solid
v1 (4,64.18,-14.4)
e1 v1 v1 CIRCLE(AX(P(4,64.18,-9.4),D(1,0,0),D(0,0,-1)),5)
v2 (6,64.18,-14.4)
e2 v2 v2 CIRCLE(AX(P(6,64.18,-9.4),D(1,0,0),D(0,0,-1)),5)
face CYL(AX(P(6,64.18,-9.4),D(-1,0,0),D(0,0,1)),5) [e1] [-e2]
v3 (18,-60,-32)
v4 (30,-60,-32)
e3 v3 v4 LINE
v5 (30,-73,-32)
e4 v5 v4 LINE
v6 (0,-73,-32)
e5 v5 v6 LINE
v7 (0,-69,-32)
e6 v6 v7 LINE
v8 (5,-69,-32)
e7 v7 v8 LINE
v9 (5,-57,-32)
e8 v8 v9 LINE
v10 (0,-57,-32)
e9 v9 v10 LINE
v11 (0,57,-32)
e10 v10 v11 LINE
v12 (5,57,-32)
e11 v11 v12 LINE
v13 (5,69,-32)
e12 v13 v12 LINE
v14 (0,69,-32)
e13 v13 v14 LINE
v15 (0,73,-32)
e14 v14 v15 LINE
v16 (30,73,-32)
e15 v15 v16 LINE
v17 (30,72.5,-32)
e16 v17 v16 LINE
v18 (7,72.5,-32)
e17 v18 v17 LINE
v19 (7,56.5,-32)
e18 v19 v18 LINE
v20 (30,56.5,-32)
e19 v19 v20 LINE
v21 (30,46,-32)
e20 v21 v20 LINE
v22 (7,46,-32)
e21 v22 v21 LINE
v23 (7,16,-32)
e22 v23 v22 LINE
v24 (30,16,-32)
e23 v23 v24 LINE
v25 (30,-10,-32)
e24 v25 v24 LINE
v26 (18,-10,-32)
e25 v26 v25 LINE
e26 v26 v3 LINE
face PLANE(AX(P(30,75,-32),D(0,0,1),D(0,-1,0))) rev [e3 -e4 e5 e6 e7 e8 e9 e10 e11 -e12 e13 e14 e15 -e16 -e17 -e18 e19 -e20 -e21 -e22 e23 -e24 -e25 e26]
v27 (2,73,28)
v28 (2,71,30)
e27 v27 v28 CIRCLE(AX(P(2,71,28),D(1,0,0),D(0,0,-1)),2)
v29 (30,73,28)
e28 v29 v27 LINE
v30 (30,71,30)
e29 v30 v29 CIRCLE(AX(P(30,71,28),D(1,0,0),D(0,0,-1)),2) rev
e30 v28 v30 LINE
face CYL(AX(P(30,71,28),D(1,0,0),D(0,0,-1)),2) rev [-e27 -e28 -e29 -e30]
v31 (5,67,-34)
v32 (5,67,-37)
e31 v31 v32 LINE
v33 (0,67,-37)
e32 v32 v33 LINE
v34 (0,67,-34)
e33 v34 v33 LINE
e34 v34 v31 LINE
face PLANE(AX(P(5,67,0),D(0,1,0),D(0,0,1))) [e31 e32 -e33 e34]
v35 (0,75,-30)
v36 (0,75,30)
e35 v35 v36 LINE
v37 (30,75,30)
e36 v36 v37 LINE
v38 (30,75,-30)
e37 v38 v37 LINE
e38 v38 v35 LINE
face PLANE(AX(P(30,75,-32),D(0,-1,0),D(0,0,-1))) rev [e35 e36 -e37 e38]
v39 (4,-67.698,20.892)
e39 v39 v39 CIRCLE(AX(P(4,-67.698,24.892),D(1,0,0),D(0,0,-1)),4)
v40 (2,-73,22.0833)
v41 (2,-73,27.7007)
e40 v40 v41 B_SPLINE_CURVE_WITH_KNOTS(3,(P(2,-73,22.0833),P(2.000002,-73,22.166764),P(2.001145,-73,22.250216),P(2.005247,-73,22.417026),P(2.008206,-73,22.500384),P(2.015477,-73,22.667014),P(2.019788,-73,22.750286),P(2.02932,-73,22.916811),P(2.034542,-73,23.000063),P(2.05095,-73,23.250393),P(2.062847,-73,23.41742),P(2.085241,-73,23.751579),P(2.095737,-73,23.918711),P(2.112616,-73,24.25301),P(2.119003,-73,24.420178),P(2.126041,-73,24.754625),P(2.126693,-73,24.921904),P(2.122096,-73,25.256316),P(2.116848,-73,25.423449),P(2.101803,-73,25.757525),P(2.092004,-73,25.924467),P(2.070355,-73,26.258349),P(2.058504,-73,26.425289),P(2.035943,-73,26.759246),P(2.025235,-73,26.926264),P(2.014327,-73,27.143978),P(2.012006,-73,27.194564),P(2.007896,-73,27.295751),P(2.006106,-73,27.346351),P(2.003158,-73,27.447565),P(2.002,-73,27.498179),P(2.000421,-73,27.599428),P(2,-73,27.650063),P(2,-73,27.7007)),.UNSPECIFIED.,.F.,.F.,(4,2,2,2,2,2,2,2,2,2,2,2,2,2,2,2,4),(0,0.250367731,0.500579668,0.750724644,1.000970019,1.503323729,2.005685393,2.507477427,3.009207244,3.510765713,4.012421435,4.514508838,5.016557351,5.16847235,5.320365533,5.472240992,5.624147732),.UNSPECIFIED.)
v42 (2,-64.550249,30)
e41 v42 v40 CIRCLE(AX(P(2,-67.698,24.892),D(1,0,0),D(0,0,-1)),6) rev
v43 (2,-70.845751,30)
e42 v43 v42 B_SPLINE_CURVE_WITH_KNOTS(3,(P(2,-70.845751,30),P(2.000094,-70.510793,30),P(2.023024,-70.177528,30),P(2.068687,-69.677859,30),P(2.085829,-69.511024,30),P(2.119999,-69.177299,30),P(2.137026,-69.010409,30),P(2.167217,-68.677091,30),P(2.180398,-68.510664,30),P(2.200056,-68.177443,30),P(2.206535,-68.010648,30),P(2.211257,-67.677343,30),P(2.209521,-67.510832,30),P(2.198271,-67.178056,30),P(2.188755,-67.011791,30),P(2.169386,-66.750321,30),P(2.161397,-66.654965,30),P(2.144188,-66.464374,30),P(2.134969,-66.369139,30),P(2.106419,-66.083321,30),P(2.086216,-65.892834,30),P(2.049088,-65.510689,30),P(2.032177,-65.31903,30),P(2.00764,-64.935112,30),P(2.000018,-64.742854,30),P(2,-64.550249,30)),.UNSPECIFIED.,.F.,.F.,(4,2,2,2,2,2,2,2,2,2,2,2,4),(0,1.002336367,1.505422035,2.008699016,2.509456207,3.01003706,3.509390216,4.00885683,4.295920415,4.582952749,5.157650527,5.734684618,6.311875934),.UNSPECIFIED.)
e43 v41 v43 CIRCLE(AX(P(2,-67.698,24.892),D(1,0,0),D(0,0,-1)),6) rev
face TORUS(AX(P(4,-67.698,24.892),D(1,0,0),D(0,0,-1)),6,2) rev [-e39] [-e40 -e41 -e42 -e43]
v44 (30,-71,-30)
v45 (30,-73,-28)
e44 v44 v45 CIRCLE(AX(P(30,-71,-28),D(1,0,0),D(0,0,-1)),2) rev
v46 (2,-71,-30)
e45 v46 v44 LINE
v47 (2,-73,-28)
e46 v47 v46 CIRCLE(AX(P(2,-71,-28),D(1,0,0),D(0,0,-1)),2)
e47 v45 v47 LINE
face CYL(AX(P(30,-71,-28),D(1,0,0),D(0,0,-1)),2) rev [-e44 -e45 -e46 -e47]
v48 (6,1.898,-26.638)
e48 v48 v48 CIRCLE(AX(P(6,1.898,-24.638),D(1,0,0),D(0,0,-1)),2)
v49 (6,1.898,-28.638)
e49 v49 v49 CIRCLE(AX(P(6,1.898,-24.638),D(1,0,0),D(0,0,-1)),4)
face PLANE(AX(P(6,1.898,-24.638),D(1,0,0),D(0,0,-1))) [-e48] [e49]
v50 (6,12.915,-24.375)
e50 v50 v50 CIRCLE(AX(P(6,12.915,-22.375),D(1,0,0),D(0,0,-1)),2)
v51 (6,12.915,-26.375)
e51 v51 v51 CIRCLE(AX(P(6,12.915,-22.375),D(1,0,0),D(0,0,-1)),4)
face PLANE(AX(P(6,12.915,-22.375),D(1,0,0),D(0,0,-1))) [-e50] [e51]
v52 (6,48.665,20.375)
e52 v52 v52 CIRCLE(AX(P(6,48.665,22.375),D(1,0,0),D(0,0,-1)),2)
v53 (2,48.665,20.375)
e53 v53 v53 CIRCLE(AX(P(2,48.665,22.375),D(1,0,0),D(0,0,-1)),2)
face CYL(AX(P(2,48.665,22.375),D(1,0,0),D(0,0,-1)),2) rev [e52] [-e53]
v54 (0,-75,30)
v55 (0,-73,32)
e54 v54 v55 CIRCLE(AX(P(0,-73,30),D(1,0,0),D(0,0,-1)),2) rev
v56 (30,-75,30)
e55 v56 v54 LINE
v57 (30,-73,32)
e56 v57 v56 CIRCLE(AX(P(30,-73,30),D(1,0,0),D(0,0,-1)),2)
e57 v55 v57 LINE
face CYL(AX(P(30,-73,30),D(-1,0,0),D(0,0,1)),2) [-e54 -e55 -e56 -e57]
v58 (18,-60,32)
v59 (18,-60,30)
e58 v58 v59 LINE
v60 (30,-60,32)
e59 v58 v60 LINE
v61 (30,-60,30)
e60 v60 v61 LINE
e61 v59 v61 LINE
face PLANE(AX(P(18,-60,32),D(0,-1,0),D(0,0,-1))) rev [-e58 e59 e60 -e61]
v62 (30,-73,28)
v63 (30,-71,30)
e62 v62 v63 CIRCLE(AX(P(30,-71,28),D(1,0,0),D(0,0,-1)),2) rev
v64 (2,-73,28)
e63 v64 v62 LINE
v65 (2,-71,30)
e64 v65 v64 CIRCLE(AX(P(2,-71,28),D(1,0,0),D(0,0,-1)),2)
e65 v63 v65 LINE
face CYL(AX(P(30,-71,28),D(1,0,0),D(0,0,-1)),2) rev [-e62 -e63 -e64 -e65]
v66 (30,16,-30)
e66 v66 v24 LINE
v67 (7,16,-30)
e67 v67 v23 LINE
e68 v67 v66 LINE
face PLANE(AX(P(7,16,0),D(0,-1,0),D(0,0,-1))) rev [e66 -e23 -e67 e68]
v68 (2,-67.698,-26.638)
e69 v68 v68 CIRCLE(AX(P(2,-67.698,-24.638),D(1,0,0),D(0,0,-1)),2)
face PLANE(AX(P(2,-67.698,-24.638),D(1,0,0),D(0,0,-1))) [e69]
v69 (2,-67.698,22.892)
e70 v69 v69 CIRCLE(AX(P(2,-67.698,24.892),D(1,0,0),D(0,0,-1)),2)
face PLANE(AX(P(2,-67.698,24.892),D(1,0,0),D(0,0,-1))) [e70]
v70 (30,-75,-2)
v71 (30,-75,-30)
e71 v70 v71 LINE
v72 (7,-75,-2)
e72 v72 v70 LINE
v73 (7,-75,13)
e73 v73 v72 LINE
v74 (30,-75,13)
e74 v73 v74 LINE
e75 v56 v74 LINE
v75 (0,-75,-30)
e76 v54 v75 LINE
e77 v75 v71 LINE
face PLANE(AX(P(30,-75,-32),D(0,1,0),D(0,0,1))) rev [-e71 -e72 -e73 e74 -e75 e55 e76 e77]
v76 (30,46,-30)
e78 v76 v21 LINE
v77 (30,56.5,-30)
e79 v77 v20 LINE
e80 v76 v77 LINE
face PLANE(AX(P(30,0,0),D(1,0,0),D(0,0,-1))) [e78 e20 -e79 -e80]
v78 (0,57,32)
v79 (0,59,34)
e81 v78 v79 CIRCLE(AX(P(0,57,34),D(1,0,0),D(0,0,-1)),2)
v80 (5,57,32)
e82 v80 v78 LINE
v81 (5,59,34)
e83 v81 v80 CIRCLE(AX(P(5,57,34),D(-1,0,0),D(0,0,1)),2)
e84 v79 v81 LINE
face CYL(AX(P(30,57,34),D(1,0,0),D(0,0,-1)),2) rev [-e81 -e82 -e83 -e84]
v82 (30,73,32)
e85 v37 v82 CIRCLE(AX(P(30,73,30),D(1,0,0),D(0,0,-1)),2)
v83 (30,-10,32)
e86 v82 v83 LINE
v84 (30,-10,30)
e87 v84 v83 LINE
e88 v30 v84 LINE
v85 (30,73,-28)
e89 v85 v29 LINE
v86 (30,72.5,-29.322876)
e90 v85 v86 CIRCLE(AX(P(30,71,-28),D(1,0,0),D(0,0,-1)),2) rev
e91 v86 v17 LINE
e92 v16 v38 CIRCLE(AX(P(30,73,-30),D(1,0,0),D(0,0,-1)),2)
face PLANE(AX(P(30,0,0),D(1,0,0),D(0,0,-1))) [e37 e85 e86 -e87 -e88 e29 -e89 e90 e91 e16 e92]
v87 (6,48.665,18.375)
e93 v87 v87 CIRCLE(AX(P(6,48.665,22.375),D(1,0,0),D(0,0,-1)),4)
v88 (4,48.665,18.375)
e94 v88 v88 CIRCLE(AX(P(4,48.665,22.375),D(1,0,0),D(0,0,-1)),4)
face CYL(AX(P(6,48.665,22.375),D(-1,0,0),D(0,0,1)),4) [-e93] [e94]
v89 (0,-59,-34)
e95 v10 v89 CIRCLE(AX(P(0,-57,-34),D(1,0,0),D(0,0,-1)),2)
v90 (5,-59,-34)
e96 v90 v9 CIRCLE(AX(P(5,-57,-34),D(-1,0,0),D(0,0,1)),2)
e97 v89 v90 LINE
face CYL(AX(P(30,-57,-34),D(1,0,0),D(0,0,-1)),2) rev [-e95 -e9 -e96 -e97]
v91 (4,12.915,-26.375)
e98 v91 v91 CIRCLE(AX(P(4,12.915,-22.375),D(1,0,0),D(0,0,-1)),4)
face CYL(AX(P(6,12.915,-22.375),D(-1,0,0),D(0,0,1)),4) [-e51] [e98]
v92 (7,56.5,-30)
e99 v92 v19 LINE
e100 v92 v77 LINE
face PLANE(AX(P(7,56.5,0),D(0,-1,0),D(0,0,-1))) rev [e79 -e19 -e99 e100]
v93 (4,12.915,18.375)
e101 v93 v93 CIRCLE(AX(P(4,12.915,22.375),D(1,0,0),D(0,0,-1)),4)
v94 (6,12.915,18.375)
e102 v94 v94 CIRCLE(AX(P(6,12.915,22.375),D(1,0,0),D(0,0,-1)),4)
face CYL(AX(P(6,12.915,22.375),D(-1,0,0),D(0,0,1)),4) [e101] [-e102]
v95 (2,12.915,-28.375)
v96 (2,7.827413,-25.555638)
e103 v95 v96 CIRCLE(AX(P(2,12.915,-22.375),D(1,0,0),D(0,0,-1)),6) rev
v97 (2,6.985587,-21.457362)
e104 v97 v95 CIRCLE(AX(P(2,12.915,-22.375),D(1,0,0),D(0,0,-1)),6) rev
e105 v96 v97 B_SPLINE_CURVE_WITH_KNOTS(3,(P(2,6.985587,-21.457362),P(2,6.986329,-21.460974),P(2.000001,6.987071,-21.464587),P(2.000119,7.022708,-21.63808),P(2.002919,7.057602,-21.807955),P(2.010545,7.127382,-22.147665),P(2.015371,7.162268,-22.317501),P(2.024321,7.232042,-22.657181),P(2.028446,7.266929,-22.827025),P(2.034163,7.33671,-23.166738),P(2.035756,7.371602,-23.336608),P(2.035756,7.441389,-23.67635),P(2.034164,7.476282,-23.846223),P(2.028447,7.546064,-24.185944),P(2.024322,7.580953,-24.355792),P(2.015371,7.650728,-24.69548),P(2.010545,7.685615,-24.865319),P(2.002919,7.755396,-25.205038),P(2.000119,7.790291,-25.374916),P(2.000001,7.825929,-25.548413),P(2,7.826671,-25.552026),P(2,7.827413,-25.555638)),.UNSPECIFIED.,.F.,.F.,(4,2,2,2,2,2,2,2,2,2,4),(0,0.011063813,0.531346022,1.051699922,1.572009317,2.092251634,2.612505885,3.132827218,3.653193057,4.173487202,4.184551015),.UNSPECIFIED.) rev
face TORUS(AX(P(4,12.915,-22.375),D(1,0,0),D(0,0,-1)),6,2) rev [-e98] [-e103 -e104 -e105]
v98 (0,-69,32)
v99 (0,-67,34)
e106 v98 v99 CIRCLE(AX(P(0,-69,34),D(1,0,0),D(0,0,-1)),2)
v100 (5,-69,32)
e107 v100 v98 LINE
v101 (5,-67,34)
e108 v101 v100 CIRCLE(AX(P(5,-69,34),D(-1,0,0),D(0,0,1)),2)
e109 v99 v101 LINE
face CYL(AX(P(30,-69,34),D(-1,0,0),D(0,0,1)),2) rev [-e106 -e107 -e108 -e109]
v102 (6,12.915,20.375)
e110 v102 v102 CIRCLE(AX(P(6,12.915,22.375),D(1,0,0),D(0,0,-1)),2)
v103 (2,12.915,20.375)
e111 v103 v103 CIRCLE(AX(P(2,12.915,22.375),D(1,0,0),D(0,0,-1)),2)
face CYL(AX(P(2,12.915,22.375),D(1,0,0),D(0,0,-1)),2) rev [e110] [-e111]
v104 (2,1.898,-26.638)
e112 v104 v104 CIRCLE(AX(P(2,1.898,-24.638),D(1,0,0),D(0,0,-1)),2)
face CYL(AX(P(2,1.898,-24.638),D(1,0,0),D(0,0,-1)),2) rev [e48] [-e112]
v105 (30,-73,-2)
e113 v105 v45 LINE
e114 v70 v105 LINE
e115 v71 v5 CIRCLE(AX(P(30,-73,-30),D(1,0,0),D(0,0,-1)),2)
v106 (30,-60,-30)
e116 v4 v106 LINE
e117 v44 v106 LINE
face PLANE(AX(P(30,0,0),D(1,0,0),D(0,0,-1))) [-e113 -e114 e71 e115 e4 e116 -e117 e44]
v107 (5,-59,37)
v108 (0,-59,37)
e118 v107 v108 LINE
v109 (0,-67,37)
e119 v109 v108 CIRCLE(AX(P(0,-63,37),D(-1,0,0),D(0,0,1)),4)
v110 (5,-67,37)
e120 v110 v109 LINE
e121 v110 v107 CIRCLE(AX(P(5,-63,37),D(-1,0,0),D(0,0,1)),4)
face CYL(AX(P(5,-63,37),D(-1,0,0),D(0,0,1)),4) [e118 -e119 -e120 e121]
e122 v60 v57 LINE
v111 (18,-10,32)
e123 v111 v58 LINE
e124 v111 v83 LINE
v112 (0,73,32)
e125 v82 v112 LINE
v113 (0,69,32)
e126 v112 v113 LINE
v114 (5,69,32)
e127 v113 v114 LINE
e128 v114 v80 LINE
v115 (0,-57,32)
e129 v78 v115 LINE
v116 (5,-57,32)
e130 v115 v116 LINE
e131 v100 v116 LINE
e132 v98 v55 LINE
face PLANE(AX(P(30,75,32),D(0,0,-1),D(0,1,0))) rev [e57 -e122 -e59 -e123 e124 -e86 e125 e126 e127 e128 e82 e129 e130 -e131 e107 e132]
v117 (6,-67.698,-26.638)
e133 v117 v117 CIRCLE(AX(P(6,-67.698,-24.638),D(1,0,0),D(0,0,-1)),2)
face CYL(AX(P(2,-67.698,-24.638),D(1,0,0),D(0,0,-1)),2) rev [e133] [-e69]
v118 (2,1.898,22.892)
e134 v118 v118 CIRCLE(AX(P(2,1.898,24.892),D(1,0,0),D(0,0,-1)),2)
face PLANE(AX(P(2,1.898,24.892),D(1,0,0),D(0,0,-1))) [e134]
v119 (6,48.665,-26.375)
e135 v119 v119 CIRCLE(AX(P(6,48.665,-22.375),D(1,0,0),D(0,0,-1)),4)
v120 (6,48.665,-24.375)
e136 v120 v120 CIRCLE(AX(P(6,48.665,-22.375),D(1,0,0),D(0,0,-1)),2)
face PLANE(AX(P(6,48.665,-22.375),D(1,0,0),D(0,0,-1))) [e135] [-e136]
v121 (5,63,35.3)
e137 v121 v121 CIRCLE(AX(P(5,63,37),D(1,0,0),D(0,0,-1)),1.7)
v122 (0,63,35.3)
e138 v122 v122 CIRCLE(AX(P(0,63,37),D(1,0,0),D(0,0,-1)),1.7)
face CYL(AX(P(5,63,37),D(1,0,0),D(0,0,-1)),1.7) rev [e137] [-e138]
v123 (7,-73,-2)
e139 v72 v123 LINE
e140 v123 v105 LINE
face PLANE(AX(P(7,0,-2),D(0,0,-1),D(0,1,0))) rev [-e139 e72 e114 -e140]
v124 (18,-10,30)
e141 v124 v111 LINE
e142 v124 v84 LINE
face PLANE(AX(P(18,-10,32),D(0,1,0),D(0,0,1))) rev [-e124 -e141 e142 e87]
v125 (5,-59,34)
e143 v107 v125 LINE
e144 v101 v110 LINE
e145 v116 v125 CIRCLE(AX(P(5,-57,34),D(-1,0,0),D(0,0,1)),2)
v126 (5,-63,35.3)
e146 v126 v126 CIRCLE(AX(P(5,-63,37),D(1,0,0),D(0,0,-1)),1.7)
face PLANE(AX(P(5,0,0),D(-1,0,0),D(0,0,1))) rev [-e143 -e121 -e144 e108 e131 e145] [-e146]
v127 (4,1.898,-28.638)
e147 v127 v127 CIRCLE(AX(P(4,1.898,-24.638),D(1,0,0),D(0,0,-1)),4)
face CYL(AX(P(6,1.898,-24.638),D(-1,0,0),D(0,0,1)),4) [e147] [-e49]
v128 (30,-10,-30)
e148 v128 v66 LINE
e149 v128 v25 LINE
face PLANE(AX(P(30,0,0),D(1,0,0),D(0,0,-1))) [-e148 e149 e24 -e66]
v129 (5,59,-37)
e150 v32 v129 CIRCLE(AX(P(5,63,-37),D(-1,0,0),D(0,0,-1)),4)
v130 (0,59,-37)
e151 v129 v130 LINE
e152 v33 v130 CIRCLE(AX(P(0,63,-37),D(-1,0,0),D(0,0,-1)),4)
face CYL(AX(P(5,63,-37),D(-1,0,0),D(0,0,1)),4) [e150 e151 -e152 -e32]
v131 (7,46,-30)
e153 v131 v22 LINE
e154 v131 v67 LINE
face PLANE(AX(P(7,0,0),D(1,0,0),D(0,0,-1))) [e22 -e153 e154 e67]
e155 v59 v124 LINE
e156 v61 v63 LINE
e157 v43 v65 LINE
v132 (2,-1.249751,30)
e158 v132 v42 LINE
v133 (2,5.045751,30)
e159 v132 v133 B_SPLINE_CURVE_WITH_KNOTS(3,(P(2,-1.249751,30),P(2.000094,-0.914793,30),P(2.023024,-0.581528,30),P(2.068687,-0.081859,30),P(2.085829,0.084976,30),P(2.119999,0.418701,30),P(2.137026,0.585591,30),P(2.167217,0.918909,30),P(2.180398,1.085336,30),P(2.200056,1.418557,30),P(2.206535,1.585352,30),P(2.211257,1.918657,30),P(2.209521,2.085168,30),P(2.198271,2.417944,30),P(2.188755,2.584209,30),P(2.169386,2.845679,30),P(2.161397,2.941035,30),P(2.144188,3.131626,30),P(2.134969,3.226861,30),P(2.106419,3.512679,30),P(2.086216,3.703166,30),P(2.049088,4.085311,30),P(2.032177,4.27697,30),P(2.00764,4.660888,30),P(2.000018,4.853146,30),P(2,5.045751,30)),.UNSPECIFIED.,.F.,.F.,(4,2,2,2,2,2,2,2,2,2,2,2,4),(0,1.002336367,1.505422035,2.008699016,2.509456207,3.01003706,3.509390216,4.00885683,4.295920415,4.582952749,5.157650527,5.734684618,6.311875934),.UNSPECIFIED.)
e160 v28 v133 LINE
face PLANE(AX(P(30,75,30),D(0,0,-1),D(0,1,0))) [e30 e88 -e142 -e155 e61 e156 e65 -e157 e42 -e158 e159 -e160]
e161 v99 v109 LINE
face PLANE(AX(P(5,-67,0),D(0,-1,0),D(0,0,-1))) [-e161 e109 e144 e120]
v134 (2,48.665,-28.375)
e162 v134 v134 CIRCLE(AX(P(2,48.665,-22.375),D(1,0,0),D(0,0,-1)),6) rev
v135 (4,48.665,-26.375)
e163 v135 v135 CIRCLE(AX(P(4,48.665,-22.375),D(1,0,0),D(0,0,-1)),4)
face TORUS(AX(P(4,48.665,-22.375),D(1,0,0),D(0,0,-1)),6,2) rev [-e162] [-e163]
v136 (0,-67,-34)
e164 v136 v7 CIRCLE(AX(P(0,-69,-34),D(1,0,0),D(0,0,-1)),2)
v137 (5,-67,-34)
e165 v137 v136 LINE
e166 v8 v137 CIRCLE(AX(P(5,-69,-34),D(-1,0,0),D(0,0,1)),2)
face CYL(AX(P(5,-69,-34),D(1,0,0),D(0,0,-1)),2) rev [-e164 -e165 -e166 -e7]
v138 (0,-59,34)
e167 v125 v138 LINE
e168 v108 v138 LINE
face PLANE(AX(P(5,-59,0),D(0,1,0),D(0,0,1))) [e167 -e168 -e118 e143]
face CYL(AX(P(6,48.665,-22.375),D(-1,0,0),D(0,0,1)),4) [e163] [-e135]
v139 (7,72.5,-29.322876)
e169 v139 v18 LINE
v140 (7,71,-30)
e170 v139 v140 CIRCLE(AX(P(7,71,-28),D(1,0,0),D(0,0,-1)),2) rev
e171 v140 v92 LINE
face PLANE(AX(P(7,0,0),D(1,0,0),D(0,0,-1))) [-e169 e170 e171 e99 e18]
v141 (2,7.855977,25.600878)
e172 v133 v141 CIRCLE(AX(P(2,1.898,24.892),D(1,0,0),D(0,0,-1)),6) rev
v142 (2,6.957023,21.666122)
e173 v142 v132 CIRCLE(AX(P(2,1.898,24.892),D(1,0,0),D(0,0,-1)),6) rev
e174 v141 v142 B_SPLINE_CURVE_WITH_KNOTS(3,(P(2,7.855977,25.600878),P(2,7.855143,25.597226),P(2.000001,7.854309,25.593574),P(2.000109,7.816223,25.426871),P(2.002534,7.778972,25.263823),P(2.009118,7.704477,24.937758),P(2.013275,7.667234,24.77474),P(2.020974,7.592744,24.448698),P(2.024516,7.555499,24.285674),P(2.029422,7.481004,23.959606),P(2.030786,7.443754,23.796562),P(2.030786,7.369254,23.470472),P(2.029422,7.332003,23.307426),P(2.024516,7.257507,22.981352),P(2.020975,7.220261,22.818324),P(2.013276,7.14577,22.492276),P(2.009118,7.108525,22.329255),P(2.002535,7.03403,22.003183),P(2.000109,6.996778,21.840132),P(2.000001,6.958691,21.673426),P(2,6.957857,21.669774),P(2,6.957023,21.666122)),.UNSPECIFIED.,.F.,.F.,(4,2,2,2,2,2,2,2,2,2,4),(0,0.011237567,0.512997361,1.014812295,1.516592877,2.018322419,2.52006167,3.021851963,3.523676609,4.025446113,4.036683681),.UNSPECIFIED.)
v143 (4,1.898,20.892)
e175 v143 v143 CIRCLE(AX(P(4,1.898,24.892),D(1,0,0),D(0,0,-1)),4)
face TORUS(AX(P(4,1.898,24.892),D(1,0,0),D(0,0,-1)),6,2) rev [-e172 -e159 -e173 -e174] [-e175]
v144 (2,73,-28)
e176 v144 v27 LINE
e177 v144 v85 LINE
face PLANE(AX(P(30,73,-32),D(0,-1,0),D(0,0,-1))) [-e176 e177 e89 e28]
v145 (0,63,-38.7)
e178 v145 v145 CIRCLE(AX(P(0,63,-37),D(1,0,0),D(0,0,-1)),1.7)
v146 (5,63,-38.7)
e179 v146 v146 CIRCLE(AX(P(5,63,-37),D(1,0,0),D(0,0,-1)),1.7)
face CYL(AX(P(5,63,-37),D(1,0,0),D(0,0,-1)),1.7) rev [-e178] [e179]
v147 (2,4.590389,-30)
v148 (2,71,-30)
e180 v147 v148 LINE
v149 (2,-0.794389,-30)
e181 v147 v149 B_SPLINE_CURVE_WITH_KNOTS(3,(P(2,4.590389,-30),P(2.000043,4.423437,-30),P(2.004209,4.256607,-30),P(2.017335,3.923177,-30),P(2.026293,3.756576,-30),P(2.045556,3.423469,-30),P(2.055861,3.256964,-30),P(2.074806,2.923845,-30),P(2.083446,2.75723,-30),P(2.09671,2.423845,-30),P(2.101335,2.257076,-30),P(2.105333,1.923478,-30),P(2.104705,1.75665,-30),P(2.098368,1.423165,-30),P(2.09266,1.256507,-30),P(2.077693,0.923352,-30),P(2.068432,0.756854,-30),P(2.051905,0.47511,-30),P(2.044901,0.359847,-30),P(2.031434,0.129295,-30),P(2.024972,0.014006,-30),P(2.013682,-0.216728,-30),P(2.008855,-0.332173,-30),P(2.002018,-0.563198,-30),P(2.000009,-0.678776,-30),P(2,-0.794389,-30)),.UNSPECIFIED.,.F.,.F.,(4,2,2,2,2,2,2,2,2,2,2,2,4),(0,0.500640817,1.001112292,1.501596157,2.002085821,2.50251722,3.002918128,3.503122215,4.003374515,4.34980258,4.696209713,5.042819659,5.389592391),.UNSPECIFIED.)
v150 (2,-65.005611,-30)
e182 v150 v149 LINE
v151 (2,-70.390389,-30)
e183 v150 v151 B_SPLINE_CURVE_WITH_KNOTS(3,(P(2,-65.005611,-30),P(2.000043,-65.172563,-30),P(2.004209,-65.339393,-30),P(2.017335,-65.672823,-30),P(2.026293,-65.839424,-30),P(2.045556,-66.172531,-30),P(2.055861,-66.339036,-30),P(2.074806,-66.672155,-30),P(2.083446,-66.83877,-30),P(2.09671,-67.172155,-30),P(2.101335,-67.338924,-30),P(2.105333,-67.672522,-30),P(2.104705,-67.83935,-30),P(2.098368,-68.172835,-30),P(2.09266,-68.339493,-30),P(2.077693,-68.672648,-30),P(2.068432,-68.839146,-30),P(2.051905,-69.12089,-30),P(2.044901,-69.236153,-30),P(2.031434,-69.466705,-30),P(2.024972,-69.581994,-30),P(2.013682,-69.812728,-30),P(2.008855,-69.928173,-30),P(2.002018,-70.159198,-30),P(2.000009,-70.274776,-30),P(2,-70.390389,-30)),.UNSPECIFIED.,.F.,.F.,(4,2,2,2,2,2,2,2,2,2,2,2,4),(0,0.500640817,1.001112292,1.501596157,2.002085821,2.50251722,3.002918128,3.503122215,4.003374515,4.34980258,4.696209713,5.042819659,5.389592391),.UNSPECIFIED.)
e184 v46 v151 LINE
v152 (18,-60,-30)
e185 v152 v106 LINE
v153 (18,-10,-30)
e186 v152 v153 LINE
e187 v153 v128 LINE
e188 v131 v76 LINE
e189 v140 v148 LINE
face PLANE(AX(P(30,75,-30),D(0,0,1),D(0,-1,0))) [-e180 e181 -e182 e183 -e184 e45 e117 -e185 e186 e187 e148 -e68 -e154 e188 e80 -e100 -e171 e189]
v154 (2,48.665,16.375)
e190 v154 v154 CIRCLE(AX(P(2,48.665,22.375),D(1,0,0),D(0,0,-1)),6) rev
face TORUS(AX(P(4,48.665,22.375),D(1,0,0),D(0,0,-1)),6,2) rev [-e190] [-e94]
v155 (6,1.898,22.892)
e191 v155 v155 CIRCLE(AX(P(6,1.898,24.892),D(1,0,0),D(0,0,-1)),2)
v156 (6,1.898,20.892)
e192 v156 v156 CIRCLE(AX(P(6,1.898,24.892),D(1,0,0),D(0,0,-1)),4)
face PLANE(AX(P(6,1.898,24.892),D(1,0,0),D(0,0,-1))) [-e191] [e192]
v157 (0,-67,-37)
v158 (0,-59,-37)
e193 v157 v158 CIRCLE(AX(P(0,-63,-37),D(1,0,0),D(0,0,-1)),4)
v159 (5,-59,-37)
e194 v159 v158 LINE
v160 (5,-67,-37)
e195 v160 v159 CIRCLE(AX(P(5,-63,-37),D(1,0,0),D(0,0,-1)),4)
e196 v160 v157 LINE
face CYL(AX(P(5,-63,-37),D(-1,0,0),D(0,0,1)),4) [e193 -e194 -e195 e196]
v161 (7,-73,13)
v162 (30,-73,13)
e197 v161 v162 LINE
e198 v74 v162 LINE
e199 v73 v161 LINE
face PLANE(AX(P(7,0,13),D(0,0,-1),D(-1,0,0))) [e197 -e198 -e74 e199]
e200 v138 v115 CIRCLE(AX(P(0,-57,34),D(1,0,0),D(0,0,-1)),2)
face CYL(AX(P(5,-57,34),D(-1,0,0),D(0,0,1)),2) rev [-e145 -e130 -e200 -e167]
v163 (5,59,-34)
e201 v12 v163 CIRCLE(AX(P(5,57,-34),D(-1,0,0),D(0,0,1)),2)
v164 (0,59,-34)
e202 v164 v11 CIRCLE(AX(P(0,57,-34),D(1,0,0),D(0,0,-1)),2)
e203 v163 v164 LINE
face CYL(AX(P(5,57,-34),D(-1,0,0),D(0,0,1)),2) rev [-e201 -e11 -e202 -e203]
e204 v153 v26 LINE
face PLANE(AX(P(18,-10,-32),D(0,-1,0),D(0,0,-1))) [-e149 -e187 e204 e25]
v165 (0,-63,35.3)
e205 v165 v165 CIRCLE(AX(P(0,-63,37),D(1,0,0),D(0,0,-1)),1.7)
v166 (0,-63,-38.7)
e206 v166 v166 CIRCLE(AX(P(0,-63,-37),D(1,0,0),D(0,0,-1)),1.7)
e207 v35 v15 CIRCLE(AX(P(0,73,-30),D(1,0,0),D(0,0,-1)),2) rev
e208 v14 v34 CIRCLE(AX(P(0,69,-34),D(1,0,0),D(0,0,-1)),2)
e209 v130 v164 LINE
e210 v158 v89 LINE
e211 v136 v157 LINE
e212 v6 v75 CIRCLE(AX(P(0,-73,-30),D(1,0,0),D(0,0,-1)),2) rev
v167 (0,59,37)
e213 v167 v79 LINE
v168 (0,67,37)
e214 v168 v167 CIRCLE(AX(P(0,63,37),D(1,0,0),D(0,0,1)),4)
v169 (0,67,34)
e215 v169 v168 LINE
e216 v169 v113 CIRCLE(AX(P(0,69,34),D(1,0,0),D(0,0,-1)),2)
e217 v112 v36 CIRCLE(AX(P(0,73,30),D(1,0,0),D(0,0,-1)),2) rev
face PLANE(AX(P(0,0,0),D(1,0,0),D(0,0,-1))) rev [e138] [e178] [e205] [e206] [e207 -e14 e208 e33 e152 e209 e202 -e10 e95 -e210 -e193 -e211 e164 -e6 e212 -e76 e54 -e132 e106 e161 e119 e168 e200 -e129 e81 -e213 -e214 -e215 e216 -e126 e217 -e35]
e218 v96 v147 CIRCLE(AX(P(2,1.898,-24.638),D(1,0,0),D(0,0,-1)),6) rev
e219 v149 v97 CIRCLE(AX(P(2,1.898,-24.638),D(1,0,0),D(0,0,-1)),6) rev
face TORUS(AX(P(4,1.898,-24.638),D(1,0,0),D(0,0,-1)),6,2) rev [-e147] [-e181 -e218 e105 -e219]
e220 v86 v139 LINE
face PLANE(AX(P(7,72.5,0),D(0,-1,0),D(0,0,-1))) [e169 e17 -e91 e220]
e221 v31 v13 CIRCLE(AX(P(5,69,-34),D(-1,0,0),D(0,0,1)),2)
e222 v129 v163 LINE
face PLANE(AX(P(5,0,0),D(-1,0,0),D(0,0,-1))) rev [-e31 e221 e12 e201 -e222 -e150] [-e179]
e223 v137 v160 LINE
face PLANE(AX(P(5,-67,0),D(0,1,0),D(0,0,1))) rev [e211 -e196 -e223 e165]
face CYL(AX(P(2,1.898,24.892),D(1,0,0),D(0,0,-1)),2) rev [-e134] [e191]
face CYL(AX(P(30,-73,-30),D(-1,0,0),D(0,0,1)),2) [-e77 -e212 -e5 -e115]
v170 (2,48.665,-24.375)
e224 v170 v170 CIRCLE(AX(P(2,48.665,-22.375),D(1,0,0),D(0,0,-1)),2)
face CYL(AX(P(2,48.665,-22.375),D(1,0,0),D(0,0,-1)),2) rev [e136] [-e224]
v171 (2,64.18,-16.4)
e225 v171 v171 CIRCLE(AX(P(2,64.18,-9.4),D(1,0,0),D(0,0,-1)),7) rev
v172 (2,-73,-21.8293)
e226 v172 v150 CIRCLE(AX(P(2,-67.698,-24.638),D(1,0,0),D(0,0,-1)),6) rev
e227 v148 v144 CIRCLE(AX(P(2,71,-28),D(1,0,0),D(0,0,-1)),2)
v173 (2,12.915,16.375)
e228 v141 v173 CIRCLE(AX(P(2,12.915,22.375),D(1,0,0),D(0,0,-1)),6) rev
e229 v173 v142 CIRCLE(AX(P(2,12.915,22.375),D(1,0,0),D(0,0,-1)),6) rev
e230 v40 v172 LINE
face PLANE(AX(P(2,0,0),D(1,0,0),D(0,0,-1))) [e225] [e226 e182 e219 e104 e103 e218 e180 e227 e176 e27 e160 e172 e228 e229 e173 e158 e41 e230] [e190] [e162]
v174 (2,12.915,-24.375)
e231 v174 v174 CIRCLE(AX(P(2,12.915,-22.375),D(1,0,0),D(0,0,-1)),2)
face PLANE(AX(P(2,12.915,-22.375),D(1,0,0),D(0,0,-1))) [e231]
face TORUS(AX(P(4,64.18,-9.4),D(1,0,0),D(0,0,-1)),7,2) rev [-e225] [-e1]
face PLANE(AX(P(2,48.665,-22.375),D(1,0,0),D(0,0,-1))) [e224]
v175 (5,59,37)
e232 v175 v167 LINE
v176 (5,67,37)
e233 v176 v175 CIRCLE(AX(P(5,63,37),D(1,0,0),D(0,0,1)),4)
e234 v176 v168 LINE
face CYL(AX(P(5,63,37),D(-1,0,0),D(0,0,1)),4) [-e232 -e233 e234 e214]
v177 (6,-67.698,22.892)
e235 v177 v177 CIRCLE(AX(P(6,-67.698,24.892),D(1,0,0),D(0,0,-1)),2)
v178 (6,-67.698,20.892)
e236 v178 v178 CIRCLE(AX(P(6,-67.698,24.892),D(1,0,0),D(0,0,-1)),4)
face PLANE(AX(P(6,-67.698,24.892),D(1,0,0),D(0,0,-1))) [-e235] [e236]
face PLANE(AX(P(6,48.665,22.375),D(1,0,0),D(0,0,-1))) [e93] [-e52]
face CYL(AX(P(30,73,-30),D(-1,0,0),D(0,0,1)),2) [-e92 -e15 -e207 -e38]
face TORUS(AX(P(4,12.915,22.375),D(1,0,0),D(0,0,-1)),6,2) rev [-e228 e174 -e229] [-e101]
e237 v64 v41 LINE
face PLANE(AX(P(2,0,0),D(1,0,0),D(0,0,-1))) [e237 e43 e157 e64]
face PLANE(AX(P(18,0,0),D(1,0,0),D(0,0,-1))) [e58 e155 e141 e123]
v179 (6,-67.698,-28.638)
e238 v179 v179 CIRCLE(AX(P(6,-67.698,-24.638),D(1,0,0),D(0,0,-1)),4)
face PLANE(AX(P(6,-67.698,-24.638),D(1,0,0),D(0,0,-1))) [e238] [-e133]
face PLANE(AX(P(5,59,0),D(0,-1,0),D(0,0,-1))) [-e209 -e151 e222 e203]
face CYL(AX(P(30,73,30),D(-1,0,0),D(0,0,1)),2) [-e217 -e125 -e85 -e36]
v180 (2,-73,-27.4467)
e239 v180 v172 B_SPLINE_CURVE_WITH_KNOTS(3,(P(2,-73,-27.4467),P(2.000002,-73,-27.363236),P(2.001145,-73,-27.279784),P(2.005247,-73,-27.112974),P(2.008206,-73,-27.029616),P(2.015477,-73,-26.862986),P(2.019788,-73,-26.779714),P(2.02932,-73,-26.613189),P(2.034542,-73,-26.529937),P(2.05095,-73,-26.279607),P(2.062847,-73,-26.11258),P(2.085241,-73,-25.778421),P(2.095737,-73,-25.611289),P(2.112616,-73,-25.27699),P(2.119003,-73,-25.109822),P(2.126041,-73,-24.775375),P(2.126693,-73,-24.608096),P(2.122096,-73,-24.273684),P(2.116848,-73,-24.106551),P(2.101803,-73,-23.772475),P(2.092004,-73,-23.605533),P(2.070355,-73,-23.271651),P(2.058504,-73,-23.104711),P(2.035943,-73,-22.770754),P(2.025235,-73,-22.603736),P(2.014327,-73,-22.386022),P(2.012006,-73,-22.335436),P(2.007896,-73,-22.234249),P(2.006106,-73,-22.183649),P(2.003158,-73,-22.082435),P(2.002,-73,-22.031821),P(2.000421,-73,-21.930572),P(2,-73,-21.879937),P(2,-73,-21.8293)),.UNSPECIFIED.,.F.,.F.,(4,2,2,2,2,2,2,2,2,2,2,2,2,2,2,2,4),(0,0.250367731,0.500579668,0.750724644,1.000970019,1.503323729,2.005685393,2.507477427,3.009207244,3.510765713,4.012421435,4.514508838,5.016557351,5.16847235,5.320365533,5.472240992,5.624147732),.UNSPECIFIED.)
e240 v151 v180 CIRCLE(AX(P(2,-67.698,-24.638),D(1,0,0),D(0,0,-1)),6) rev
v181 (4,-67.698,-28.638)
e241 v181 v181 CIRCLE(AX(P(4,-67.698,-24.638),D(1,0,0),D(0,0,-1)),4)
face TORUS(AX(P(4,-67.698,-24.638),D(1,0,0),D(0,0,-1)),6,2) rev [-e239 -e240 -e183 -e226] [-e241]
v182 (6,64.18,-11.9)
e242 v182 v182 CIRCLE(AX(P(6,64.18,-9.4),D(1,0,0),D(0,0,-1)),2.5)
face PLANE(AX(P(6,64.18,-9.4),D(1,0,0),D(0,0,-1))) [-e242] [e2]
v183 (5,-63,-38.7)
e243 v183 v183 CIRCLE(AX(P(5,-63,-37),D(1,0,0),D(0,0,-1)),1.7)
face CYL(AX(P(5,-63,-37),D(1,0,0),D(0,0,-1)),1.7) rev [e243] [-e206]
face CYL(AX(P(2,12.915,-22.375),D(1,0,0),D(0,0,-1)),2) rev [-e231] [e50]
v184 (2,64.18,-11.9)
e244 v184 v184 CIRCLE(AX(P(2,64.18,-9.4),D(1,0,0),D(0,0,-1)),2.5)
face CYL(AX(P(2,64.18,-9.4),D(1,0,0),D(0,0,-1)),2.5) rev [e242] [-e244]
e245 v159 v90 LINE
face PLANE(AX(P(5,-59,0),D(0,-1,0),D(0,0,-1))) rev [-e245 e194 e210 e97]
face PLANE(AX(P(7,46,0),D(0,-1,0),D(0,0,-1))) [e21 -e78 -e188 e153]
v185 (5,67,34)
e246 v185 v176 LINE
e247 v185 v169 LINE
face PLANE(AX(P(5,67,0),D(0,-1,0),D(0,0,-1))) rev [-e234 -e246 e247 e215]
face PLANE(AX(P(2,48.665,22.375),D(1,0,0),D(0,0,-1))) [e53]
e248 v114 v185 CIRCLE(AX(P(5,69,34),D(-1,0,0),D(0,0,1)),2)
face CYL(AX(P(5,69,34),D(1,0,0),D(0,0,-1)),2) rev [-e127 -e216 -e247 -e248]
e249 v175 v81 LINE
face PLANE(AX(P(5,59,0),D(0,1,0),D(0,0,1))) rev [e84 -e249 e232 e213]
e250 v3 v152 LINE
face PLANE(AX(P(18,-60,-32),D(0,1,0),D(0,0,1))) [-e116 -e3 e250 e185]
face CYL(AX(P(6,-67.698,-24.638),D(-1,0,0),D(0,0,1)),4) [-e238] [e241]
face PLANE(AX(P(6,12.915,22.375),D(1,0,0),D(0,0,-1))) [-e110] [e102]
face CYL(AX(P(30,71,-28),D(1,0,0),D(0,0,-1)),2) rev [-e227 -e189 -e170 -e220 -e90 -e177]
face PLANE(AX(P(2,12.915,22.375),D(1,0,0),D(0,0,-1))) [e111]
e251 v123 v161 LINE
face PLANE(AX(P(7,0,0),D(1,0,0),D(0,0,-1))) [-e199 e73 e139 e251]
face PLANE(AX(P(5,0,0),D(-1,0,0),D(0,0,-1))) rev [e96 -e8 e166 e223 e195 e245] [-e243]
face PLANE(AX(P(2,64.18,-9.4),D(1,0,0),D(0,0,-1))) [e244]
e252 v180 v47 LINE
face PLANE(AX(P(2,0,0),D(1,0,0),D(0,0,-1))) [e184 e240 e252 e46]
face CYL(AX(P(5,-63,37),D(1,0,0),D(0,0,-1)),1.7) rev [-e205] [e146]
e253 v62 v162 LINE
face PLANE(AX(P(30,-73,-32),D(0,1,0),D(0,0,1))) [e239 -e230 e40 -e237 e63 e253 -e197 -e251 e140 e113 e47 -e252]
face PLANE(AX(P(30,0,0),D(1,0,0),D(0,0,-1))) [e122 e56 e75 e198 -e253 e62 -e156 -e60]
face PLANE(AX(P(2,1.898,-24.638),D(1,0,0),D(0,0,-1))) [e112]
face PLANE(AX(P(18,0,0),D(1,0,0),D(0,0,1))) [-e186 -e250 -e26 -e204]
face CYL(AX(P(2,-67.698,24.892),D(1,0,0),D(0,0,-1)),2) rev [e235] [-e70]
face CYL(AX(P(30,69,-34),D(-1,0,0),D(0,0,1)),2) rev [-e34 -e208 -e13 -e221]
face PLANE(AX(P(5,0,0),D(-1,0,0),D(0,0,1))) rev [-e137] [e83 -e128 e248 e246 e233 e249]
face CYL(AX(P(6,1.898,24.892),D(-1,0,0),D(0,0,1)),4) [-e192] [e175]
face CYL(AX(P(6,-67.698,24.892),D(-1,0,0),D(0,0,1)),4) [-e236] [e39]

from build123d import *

# Parameters (mm, degrees)
SKETCH1_W                                = 150
SKETCH1_H                                = 64
BOSS_EXTRUDE1_DEPTH                      = 30
SHELL1_T                                 = -2
SKETCH2_R                                = 4
SKETCH2_R_2                              = 5
MOUNT_BOSS_DEPTH                         = 4
SKETCH3_R                                = 2
SKETCH3_R_2                              = 2.5
M2_5_INSERT_RECESS_DEPTH                 = 4
FILLET1_R                                = 2
SKETCH4_W                                = 2
SKETCH4_H                                = 15
SKETCH4_W_2                              = 30
SKETCH4_H_2                              = 2
SKETCH4_W_3                              = 16
CUT_EXTRUDE2_DEPTH                       = 23
SKETCH5_W                                = 50
SKETCH5_H                                = 2
CUT_EXTRUDE3_DEPTH                       = 12
FILLET2_R                                = 2
MOUNT_TAB_DEPTH                          = 5
M3_CLEARANCE_HOLE1_D                     = 3.4
MIRROR2_AT_THE_SECOND_PLANE_COPY_1_DEPTH = 5
MIRROR2_AT_THE_SECOND_PLANE_COPY_2_D     = 3.4
FILLET3_R                                = 2


with BuildPart() as part:
    # Sketch1 → Boss-Extrude1 (new body)
    with BuildSketch(Plane.YZ):
        Rectangle(SKETCH1_W, SKETCH1_H)
    extrude(amount=BOSS_EXTRUDE1_DEPTH)

    # Shell1
    shell1_openings = [part.faces().sort_by_distance(p)[0] for p in [
        (30, 0, 0),
    ]]
    offset(amount=SHELL1_T, openings=shell1_openings, kind=Kind.INTERSECTION)

    # Sketch2 → Mount boss (add)
    with BuildSketch(Plane.YZ.offset(2)):
        with Locations(Location((-67.698, 24.892, 0), (0, 0, 270))):
            Circle(SKETCH2_R)
        with Locations(Location((1.898, 24.892, 0), (0, 0, 270))):
            Circle(SKETCH2_R)
        with Locations(Location((1.898, -24.638, 0), (0, 0, 270))):
            Circle(SKETCH2_R)
        with Locations(Location((-67.698, -24.638, 0), (0, 0, 270))):
            Circle(SKETCH2_R)
        with Locations(Location((12.915, 22.375, 0), (0, 0, 270))):
            Circle(SKETCH2_R)
        with Locations(Location((48.665, 22.375, 0), (0, 0, 270))):
            Circle(SKETCH2_R)
        with Locations(Location((12.915, -22.375, 0), (0, 0, 270))):
            Circle(SKETCH2_R)
        with Locations(Location((48.665, -22.375, 0), (0, 0, 270))):
            Circle(SKETCH2_R)
        with Locations(Location((64.18, -9.4, 0), (0, 0, 270))):
            Circle(SKETCH2_R_2)
    extrude(amount=MOUNT_BOSS_DEPTH)

    # Sketch3 → M2.5 insert recess (cut)
    with BuildSketch(Plane.YZ.offset(6)):
        with Locations(Location((-67.698, 24.892, 0), (0, 0, 270))):
            Circle(SKETCH3_R)
        with Locations(Location((1.898, 24.892, 0), (0, 0, 270))):
            Circle(SKETCH3_R)
        with Locations(Location((1.898, -24.638, 0), (0, 0, 270))):
            Circle(SKETCH3_R)
        with Locations(Location((-67.698, -24.638, 0), (0, 0, 270))):
            Circle(SKETCH3_R)
        with Locations(Location((12.915, 22.375, 0), (0, 0, 270))):
            Circle(SKETCH3_R)
        with Locations(Location((48.665, 22.375, 0), (0, 0, 270))):
            Circle(SKETCH3_R)
        with Locations(Location((48.665, -22.375, 0), (0, 0, 270))):
            Circle(SKETCH3_R)
        with Locations(Location((12.915, -22.375, 0), (0, 0, 270))):
            Circle(SKETCH3_R)
        with Locations(Location((64.18, -9.4, 0), (0, 0, 270))):
            Circle(SKETCH3_R_2)
    extrude(amount=-M2_5_INSERT_RECESS_DEPTH, mode=Mode.SUBTRACT)

    # Fillet1
    # the kernel refuses this fillet: 2 mm, written as the material it adds along each edge
    with BuildSketch(Plane(origin=(2, 12.915, 22.375), x_dir=(0, 0, -1), z_dir=(0, -1, 0))) as fillet1_piece_1:
        with BuildLine():
            CenterArc((4 + FILLET1_R, FILLET1_R), FILLET1_R, 180, 90)
            Line((4, FILLET1_R), (4, 0))
            Line((4, 0), (4 + FILLET1_R, 0))
        make_face()
    revolve(axis=Axis((2, 12.915, 22.375), (1, 0, 0)))
    with BuildSketch(Plane(origin=(2, -67.698, -24.638), x_dir=(0, 0, -1), z_dir=(0, -1, 0))) as fillet1_piece_2:
        with BuildLine():
            CenterArc((4 + FILLET1_R, FILLET1_R), FILLET1_R, 180, 90)
            Line((4, FILLET1_R), (4, 0))
            Line((4, 0), (4 + FILLET1_R, 0))
        make_face()
    revolve(axis=Axis((2, -67.698, -24.638), (1, 0, 0)))
    with BuildSketch(Plane(origin=(2, 1.898, -24.638), x_dir=(0, 0, -1), z_dir=(0, -1, 0))) as fillet1_piece_3:
        with BuildLine():
            CenterArc((4 + FILLET1_R, FILLET1_R), FILLET1_R, 180, 90)
            Line((4, FILLET1_R), (4, 0))
            Line((4, 0), (4 + FILLET1_R, 0))
        make_face()
    revolve(axis=Axis((2, 1.898, -24.638), (1, 0, 0)))
    with BuildSketch(Plane(origin=(2, 1.898, 24.892), x_dir=(0, 0, -1), z_dir=(0, -1, 0))) as fillet1_piece_4:
        with BuildLine():
            CenterArc((4 + FILLET1_R, FILLET1_R), FILLET1_R, 180, 90)
            Line((4, FILLET1_R), (4, 0))
            Line((4, 0), (4 + FILLET1_R, 0))
        make_face()
    revolve(axis=Axis((2, 1.898, 24.892), (1, 0, 0)))
    with BuildSketch(Plane(origin=(2, 64.18, -9.4), x_dir=(0, 0, -1), z_dir=(0, -1, 0))) as fillet1_piece_5:
        with BuildLine():
            CenterArc((5 + FILLET1_R, FILLET1_R), FILLET1_R, 180, 90)
            Line((5, FILLET1_R), (5, 0))
            Line((5, 0), (5 + FILLET1_R, 0))
        make_face()
    revolve(axis=Axis((2, 64.18, -9.4), (1, 0, 0)))
    with BuildSketch(Plane(origin=(2, 48.665, -22.375), x_dir=(0, 0, -1), z_dir=(0, -1, 0))) as fillet1_piece_6:
        with BuildLine():
            CenterArc((4 + FILLET1_R, FILLET1_R), FILLET1_R, 180, 90)
            Line((4, FILLET1_R), (4, 0))
            Line((4, 0), (4 + FILLET1_R, 0))
        make_face()
    revolve(axis=Axis((2, 48.665, -22.375), (1, 0, 0)))
    with BuildSketch(Plane(origin=(2, 12.915, -22.375), x_dir=(0, 0, -1), z_dir=(0, -1, 0))) as fillet1_piece_7:
        with BuildLine():
            CenterArc((4 + FILLET1_R, FILLET1_R), FILLET1_R, 180, 90)
            Line((4, FILLET1_R), (4, 0))
            Line((4, 0), (4 + FILLET1_R, 0))
        make_face()
    revolve(axis=Axis((2, 12.915, -22.375), (1, 0, 0)))
    with BuildSketch(Plane(origin=(2, 48.665, 22.375), x_dir=(0, 0, -1), z_dir=(0, -1, 0))) as fillet1_piece_8:
        with BuildLine():
            CenterArc((4 + FILLET1_R, FILLET1_R), FILLET1_R, 180, 90)
            Line((4, FILLET1_R), (4, 0))
            Line((4, 0), (4 + FILLET1_R, 0))
        make_face()
    revolve(axis=Axis((2, 48.665, 22.375), (1, 0, 0)))
    with BuildSketch(Plane(origin=(2, -67.698, 24.892), x_dir=(0, 0, -1), z_dir=(0, -1, 0))) as fillet1_piece_9:
        with BuildLine():
            CenterArc((4 + FILLET1_R, FILLET1_R), FILLET1_R, 180, 90)
            Line((4, FILLET1_R), (4, 0))
            Line((4, 0), (4 + FILLET1_R, 0))
        make_face()
    revolve(axis=Axis((2, -67.698, 24.892), (1, 0, 0)))

    # Sketch4 → Cut-Extrude2 (cut)
    with BuildSketch(Plane.YZ.offset(30)):
        with Locations((-74, 5.5)):
            Rectangle(SKETCH4_W, SKETCH4_H)
        with Locations((31, -31)):
            Rectangle(SKETCH4_W_2, SKETCH4_H_2)
        with Locations((64.5, -31)):
            Rectangle(SKETCH4_W_3, SKETCH4_H_2)
    extrude(amount=-CUT_EXTRUDE2_DEPTH, mode=Mode.SUBTRACT)

    # Sketch5 → Cut-Extrude3 (cut)
    with BuildSketch(Plane.YZ.offset(30)):
        with Locations((-35, 31)):
            Rectangle(SKETCH5_W, SKETCH5_H)
    cut_extrude3 = extrude(amount=-CUT_EXTRUDE3_DEPTH, mode=Mode.SUBTRACT)

    # Mirror1: Cut-Extrude3 across plane
    add(cut_extrude3.mirror(Plane.XY), mode=Mode.SUBTRACT)

    # Fillet2
    fillet2_edges = [part.edges().sort_by_distance(p)[0] for p in [
        (15, 75, 32),
        (15, -75, 32),
        (15, -75, -32),
        (15, 75, -32),
        (16, 73, -30),
        (16, -73, -30),
        (16, 73, 30),
        (16, -73, 30),
    ]]
    fillet(fillet2_edges, radius=FILLET2_R)

    # Sketch6 → Mount tab (add)
    with BuildSketch(Plane(origin=(0, 0, 0), x_dir=(0, -1, 0), z_dir=(-1, 0, 0))):
        with BuildLine():
            Line((59, 32), (67, 32))
            Line((67, 32), (67, 37))
            ThreePointArc((67, 37), (63, 41), (59, 37))
            Line((59, 37), (59, 32))
        make_face()
    mount_tab = extrude(amount=-MOUNT_TAB_DEPTH)

    # M3 Clearance Hole1 (through all)
    with Locations(Plane.YZ.offset(5)):
        with Locations((-63, 37)):
            m3_clearance_hole1 = Hole(M3_CLEARANCE_HOLE1_D / 2)

    # Mirror2: Mount tab, M3 Clearance Hole1 across plane
    add(mount_tab.mirror(Plane.ZX))
    add(m3_clearance_hole1.mirror(Plane.ZX), mode=Mode.SUBTRACT)

    # Mirror2 at the second plane: Mount tab, M3 Clearance Hole1 across plane
    add(mount_tab.mirror(Plane.XY))
    add(m3_clearance_hole1.mirror(Plane.XY), mode=Mode.SUBTRACT)

    # Mirror2 at the second plane copy 1 sketc → Mirror2 at the second plane copy 1 (add)
    with BuildSketch(Plane(origin=(0, 0, 0), x_dir=(0, 1, 0), z_dir=(-1, 0, 0))):
        with BuildLine():
            Line((59, 32), (67, 32))
            Line((67, 32), (67, 37))
            ThreePointArc((67, 37), (63, 41), (59, 37))
            Line((59, 37), (59, 32))
        make_face()
    extrude(amount=-MIRROR2_AT_THE_SECOND_PLANE_COPY_1_DEPTH)

    # Mirror2 at the second plane copy 2 (through all)
    with Locations(Plane(origin=(5, 0, 0), x_dir=(0, -1, 0), z_dir=(1, 0, 0))):
        with Locations((-63, 37)):
            Hole(MIRROR2_AT_THE_SECOND_PLANE_COPY_2_D / 2)

    # Fillet3
    fillet3_edges = [part.edges().sort_by_distance(p)[0] for p in [
        (2.5, -67, 32),
        (2.5, -59, 32),
        (2.5, -67, -32),
        (2.5, -59, -32),
        (2.5, 67, 32),
        (2.5, 59, 32),
        (2.5, 67, -32),
        (2.5, 59, -32),
    ]]
    fillet(fillet3_edges, radius=FILLET3_R)


solid = part.part
